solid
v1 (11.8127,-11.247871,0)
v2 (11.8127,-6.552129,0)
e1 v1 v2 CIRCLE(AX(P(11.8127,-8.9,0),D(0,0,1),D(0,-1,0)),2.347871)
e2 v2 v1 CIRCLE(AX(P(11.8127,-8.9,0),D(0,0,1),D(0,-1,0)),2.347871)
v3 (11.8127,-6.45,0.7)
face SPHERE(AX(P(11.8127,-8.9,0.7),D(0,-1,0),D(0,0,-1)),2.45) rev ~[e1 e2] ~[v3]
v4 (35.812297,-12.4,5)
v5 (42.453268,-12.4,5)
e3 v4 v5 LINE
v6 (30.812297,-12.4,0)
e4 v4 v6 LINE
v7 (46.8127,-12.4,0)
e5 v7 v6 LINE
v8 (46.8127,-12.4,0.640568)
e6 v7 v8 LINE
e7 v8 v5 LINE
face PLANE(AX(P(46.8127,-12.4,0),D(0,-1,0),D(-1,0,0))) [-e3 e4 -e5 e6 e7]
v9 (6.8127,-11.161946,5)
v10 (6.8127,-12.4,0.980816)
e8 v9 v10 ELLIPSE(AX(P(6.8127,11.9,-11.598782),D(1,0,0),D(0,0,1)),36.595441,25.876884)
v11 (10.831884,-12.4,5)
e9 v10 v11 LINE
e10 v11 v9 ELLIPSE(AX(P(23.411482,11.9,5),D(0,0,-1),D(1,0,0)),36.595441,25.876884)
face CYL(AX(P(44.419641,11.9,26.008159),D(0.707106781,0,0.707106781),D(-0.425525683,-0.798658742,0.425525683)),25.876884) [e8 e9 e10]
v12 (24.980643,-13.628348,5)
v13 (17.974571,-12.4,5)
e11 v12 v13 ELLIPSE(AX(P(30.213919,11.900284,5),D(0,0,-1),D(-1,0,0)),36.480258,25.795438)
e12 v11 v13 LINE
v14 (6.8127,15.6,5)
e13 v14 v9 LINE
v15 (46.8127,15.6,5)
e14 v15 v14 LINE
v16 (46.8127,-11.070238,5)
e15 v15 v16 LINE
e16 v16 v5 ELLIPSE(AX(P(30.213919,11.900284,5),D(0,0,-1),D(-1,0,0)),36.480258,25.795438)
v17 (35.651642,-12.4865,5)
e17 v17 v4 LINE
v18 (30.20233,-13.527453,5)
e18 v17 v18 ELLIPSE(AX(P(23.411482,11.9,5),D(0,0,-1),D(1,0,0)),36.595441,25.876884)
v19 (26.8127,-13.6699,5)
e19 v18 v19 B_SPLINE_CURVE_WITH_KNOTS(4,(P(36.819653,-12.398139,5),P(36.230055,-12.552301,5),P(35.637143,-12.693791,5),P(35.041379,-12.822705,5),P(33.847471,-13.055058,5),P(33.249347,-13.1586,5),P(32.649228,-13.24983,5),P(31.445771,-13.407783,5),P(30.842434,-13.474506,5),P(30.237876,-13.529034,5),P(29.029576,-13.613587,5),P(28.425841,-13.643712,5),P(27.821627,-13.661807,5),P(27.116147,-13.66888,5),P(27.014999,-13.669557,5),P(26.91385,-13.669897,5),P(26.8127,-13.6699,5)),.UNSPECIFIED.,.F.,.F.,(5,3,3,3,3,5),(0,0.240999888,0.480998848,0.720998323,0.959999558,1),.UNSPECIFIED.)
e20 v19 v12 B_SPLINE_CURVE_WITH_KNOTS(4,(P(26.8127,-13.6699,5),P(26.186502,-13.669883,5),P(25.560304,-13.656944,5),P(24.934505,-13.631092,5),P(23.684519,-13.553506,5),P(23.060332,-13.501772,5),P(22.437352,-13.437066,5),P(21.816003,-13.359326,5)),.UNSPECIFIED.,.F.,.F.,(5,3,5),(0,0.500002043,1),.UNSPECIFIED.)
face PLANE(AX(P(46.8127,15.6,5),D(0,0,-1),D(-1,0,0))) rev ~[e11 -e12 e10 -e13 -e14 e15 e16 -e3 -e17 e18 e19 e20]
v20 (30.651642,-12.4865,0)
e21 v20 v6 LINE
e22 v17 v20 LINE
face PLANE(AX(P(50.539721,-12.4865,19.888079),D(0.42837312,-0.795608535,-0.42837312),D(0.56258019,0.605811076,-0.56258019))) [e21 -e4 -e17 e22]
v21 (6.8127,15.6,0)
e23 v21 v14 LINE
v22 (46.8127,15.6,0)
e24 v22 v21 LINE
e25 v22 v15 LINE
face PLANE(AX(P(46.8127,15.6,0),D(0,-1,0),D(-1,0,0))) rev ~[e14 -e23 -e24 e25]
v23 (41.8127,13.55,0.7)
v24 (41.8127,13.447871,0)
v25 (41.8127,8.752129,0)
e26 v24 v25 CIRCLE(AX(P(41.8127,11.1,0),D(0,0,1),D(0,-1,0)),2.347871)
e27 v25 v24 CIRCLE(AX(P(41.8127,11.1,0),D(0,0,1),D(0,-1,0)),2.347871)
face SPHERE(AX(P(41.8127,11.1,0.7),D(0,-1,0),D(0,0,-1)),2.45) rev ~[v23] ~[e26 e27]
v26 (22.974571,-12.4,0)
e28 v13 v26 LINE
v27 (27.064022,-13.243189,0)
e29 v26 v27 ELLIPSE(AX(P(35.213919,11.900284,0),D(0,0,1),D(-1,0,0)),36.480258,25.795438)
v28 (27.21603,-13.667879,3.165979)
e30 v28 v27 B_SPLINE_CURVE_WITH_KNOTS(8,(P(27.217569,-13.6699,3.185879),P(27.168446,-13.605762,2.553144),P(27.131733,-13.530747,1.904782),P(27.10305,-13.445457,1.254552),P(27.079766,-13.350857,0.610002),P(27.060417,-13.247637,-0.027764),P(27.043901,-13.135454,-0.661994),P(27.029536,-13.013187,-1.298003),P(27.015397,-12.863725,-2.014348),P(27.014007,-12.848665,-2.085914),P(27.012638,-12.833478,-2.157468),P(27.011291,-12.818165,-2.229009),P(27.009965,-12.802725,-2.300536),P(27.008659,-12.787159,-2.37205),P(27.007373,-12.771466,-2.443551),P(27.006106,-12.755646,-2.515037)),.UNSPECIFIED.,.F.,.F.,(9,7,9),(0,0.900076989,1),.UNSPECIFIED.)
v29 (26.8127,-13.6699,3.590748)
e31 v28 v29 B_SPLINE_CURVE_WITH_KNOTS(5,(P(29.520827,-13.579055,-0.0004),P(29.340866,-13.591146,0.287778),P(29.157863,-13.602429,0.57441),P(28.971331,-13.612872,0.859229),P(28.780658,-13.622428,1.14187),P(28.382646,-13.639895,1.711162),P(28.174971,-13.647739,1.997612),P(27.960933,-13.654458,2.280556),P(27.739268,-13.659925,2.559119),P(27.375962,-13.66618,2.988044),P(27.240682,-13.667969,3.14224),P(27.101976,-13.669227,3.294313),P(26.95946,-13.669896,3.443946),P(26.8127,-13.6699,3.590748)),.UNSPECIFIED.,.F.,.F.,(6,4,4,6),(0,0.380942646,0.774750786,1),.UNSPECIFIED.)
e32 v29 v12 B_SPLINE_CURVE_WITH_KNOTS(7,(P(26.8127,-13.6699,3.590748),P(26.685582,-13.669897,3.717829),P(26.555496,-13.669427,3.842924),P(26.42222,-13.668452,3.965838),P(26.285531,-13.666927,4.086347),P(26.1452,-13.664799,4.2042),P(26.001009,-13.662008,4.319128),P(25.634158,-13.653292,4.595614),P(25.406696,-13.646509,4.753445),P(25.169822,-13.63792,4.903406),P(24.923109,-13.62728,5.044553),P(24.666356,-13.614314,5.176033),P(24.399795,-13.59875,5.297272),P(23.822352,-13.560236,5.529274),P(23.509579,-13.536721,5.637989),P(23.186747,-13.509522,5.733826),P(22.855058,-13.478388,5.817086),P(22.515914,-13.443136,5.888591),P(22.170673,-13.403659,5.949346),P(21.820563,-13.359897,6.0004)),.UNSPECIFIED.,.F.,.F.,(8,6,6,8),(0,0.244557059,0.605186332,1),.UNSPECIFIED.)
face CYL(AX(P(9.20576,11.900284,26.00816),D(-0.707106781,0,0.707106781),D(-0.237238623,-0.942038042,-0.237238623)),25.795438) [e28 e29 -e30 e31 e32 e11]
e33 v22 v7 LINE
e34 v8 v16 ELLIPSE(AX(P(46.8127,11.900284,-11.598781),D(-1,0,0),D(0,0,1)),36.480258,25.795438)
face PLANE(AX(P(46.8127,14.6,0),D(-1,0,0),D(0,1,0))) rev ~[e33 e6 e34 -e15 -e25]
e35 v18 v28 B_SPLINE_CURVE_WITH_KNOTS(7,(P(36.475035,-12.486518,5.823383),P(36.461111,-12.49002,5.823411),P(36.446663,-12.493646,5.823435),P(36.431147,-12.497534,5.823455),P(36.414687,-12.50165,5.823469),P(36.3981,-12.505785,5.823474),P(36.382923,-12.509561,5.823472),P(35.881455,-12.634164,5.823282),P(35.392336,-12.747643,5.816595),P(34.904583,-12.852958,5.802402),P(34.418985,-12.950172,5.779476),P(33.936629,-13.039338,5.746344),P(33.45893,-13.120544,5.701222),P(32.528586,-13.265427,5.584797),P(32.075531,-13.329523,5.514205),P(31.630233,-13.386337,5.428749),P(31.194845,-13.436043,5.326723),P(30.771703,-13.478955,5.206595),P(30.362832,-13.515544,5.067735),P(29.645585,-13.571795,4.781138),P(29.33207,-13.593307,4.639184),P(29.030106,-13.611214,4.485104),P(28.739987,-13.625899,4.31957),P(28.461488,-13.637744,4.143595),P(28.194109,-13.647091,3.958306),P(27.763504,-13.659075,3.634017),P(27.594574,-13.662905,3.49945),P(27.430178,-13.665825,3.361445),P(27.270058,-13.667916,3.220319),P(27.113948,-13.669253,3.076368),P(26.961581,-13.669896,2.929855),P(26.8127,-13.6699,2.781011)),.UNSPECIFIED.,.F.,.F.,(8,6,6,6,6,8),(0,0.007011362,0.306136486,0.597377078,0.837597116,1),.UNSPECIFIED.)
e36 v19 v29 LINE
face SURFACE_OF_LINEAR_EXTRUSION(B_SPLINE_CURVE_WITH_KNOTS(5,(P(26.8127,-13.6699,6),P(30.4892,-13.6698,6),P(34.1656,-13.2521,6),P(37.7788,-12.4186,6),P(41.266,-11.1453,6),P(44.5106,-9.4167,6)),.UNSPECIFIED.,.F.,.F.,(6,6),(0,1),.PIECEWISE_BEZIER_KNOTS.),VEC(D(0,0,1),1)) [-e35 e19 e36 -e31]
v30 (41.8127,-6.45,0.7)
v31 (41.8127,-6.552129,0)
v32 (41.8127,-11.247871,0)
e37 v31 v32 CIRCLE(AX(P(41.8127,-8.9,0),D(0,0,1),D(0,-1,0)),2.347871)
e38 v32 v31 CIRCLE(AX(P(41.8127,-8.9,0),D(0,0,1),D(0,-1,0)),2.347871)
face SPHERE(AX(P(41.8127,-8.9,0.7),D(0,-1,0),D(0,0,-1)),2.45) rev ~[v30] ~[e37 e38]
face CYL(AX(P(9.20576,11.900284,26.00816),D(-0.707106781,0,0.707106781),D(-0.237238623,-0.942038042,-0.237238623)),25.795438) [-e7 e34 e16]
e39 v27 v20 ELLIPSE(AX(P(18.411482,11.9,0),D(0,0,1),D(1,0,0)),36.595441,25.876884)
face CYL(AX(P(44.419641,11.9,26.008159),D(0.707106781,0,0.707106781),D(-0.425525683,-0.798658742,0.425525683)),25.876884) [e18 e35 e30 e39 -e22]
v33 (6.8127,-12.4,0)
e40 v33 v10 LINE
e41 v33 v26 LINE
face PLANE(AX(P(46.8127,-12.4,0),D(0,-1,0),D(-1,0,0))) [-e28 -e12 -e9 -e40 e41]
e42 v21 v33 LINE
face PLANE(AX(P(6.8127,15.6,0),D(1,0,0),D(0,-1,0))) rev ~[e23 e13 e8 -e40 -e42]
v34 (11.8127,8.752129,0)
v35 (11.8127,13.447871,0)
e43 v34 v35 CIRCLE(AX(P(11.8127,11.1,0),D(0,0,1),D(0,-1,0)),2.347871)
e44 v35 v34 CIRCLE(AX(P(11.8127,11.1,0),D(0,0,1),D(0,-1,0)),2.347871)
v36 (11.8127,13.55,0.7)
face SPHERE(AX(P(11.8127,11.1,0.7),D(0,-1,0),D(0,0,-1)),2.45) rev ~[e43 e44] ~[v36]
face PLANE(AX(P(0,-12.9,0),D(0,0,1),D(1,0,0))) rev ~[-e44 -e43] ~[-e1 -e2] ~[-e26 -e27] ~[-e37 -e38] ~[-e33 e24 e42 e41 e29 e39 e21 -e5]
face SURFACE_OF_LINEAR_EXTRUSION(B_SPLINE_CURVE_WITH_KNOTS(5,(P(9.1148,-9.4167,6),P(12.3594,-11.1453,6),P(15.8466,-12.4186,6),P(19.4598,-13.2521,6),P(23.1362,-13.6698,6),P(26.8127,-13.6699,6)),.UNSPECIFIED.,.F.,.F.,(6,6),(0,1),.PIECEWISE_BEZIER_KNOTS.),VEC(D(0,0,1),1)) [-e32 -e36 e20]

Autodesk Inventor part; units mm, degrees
ref_plane "Work Plane1" through (0, -12.9, 0) normal (0, 0, 1) x (1, 0, 0)
sketch "Sketch1" plane through (0, -12.9, 0) normal (0, 0, 1) x (1, 0, 0)
  circle A0 centre (26.8127, 14) radius 1.4 construction
  line L0 (6.8127, 27.5) -> (46.8127, 27.5)
  line L1 (46.8127, 27.5) -> (46.8127, 0.5)
  line L2 (46.8127, 0.5) -> (6.8127, 0.5)
  line L3 (6.8127, 0.5) -> (6.8127, 27.5)
  line L4 (6.8127, 27.5) -> (46.8127, 0.5) construction
  line L5 (46.8127, 27.5) -> (6.8127, 0.5) construction
  circle A1 centre (26.8127, 14) radius 12.7 construction
  circle A2 centre (26.8127, 14) radius 13
  line L6 (6.8127, 27.5) -> (46.8127, 27.5)
  line L7 (46.8127, 27.5) -> (46.8127, 28.5)
  line L8 (46.8127, 28.5) -> (6.8127, 28.5)
  line L9 (6.8127, 28.5) -> (6.8127, 27.5)
  point P0 (0, 12.9)
  dimension "d0" = 40
  dimension "d1" = 27
  dimension "d2" = 0.3
  dimension "d14" = 1
ref_plane "Work Plane2" through (14.3627, 1.55, 6) normal (0, 0, 1) x (1, 0, 0)
extrude "Extrusion1" add sketch "Sketch1" along normal up to surface (6 mm away)
ref_plane "Work Plane3" through (11.8127, 24, 6) normal (-1, 0, 0) x (0, 0, 1)
sketch "Sketch2" plane through (11.8127, 24, 6) normal (-1, 0, 0) x (0, 0, 1)
  line L0 (-9.3, 0) -> (1.55, 0) projected
  line L1 (-6, -35.9) -> (-6, -9.9) projected
  line L2 (-10.9, -34.4) -> (0.6933, -34.4)
  line L3 (-10.9, -31.4) -> (0.6933, -31.4)
  line L4 (-10.9, -14.4) -> (0.6933, -14.4)
  line L5 (-10.9, -11.4) -> (0.6933, -11.4)
  arc A0 (-5.3, -10.45) -> (-5.3, -15.35) centre (-5.3, -12.9) ccw
  arc A1 (-5.4335, -30.45) -> (-5.4335, -35.35) centre (-5.4335, -32.9) ccw
  line L6 (-5.4335, -35.35) -> (-5.4335, -30.45)
  line L7 (-5.3, -15.35) -> (-5.3, -10.45)
  point P0 (-6, -24)
  dimension "d22" = 4.9
  dimension "d23" = 1.5
  dimension "d24" = 1.5
revolve "Revolution1" cut sketch "Sketch2" angle 360 about axis through (11.8127, 8.65, 0.7) along (0, 1, 0) contours A0 L4 L1 | L1 L4 L7 A0 | L4 A0 L5 L1 | L1 L5 L7 L4 | L5 A0 L1 | L1 A0 L7 L5
pattern_linear "Rectangular Pattern1" count 2 spacing 20 along (0, -1, 0) count 2 spacing 30 along (1, 0, 0) of "Revolution1"
sketch "Sketch3" plane through (6.8127, -12.4, 6) normal (0, 0, 1) x (1, 0, 0)
  ellipse E0 centre (20, 24.3) end of major axis (41.0718, 24.3) minor radius 14.9 (7.3193, 12.4) -> (20, 9.4) ccw construction
  ellipse E1 centre (20, 24.3) end of major axis (41.0718, 24.3) minor radius 14.9 (20, 9.4) -> (32.6807, 12.4) ccw construction
  circle A0 centre (20, 13.5) radius 13 construction
  line L0 (40, 0) -> (0, 0) construction
  line L1 (40, 28) -> (40, 0) construction
  line L2 (0, 28) -> (40, 28) construction
  line L3 (0, 0) -> (0, 28) construction
  circle A1 centre (20, 13.5) radius 13 construction
  line L4 (40, 0) -> (0, 0) projected
  line L5 (10.0003, 0) -> (29.9997, 0)
  spline S0 degree 5 poles (2.3021, 2.9833) (5.5467, 1.2547) (9.0339, -0.0186) (12.6471, -0.8521) (16.3235, -1.2698) (20, -1.2699) knots 0 0 0 0 0 0 1 1 1 1 1 1
  spline S1 degree 5 poles (20, -1.2699) (23.6765, -1.2698) (27.3529, -0.8521) (30.9661, -0.0186) (34.4533, 1.2547) (37.6979, 2.9833) knots 0 0 0 0 0 0 1 1 1 1 1 1
  point P0 (-6.8127, 12.4)
extrude "Extrusion2" add sketch "Sketch3" against normal up to surface (6 mm away)
ref_plane "Work Plane4" through (26.8127, 23.9, 43.6151) normal (-0.7071068, 0, 0.7071068) x (-0.7071068, 0, -0.7071068)
sketch "Sketch4" plane through (26.8127, 23.9, 43.6151) normal (-0.7071068, 0, 0.7071068) x (-0.7071068, 0, -0.7071068)
  arc A0 (33.8666, 23.9) -> (15.9334, 23.9) centre (24.9, 12) ccw projected
  ellipse E0 centre (26.5979, 22.8) end of major axis (26.5979, 35.8) minor radius 9.1924 construction
  line L0 (12.4558, 36.3) -> (19.5271, 36.3) construction
  line L1 (12.4558, 8.3) -> (12.4558, 36.3) construction
  line L2 (40.74, 8.3) -> (12.4558, 8.3) construction
  line L3 (40.74, 36.3) -> (40.74, 8.3) construction
  line L4 (33.6687, 36.3) -> (40.74, 36.3) projected
  arc A1 (33.5545, 36.3) -> (9.1298, 32.4131) centre (24.9, 12) ccw
  line L5 (33.6687, 36.3) -> (40.74, 36.3) projected
  line L6 (33.5545, 36.3) -> (40.74, 36.3)
  line L7 (40.74, 36.3) -> (40.74, 42.5179)
  line L8 (40.74, 42.5179) -> (9.2813, 42.9694)
  line L9 (9.2813, 42.9694) -> (9.1298, 32.4131)
  point P0 (49.8, 23.9)
extrude "Extrusion3" cut sketch "Sketch4" against normal through all
ref_plane "Work Plane5" through (62.0266, 23.9, 8.4012) normal (0.7071068, 0, 0.7071068) x (-0.7071068, 0, 0.7071068)
sketch "Sketch5" plane through (62.0266, 23.9, 8.4012) normal (0.7071068, 0, 0.7071068) x (-0.7071068, 0, 0.7071068)
  arc A0 (33.8666, 23.9) -> (15.9334, 23.9) centre (24.9, 12) ccw projected
  arc A1 (40.4723, 32.6668) -> (9.3277, 32.6668) centre (24.9, 12) ccw
  line L0 (16.1313, 36.3) -> (11.8886, 36.3) projected
  line L1 (16.1313, 36.3) -> (16.2449, 36.3865) construction
  line L2 (16.2449, 36.3865) -> (16.1313, 36.3)
  line L3 (40.4723, 32.6668) -> (40.4723, 41.9024)
  line L4 (40.4723, 41.9024) -> (12.0732, 41.9024)
  line L5 (12.0732, 41.9024) -> (11.8886, 36.3)
  point P0 (37.9189, 23.9)
extrude "Extrusion4" cut sketch "Sketch5" against normal through all
sketch "Sketch6" plane through (6.8127, 15.6, 6) normal (0, 0, 1) x (1, 0, 0)
  circle A0 centre (20, -14.5) radius 13 projected
  point P0 (-6.8127, -15.6)
extrude "Extrusion5" add sketch "Sketch6" against normal up to surface (6 mm away)
sketch "Sketch7" plane through (6.8127, 15.6, 0) normal (0, 1, 0) x (1, 0, 0)
  line L0 (0, -6) -> (40, -6) construction
  line L1 (40, 0) -> (40, -6) construction
  line L2 (40, 0) -> (0, 0) construction
  line L3 (0, 0) -> (0, -6) construction
  line L4 (0, -6) -> (40, -6)
  line L5 (40, -6) -> (40, -5)
  line L6 (40, -5) -> (0, -5)
  line L7 (0, -5) -> (0, -6)
  point P0 (-6.8127, 0)
  dimension "d27" = 1
extrude "Extrusion6" cut sketch "Sketch7" against normal through all
properties part number "20_Cube_Insert_Kinematic_Mirrormount_45_Thorlabsadapter"
